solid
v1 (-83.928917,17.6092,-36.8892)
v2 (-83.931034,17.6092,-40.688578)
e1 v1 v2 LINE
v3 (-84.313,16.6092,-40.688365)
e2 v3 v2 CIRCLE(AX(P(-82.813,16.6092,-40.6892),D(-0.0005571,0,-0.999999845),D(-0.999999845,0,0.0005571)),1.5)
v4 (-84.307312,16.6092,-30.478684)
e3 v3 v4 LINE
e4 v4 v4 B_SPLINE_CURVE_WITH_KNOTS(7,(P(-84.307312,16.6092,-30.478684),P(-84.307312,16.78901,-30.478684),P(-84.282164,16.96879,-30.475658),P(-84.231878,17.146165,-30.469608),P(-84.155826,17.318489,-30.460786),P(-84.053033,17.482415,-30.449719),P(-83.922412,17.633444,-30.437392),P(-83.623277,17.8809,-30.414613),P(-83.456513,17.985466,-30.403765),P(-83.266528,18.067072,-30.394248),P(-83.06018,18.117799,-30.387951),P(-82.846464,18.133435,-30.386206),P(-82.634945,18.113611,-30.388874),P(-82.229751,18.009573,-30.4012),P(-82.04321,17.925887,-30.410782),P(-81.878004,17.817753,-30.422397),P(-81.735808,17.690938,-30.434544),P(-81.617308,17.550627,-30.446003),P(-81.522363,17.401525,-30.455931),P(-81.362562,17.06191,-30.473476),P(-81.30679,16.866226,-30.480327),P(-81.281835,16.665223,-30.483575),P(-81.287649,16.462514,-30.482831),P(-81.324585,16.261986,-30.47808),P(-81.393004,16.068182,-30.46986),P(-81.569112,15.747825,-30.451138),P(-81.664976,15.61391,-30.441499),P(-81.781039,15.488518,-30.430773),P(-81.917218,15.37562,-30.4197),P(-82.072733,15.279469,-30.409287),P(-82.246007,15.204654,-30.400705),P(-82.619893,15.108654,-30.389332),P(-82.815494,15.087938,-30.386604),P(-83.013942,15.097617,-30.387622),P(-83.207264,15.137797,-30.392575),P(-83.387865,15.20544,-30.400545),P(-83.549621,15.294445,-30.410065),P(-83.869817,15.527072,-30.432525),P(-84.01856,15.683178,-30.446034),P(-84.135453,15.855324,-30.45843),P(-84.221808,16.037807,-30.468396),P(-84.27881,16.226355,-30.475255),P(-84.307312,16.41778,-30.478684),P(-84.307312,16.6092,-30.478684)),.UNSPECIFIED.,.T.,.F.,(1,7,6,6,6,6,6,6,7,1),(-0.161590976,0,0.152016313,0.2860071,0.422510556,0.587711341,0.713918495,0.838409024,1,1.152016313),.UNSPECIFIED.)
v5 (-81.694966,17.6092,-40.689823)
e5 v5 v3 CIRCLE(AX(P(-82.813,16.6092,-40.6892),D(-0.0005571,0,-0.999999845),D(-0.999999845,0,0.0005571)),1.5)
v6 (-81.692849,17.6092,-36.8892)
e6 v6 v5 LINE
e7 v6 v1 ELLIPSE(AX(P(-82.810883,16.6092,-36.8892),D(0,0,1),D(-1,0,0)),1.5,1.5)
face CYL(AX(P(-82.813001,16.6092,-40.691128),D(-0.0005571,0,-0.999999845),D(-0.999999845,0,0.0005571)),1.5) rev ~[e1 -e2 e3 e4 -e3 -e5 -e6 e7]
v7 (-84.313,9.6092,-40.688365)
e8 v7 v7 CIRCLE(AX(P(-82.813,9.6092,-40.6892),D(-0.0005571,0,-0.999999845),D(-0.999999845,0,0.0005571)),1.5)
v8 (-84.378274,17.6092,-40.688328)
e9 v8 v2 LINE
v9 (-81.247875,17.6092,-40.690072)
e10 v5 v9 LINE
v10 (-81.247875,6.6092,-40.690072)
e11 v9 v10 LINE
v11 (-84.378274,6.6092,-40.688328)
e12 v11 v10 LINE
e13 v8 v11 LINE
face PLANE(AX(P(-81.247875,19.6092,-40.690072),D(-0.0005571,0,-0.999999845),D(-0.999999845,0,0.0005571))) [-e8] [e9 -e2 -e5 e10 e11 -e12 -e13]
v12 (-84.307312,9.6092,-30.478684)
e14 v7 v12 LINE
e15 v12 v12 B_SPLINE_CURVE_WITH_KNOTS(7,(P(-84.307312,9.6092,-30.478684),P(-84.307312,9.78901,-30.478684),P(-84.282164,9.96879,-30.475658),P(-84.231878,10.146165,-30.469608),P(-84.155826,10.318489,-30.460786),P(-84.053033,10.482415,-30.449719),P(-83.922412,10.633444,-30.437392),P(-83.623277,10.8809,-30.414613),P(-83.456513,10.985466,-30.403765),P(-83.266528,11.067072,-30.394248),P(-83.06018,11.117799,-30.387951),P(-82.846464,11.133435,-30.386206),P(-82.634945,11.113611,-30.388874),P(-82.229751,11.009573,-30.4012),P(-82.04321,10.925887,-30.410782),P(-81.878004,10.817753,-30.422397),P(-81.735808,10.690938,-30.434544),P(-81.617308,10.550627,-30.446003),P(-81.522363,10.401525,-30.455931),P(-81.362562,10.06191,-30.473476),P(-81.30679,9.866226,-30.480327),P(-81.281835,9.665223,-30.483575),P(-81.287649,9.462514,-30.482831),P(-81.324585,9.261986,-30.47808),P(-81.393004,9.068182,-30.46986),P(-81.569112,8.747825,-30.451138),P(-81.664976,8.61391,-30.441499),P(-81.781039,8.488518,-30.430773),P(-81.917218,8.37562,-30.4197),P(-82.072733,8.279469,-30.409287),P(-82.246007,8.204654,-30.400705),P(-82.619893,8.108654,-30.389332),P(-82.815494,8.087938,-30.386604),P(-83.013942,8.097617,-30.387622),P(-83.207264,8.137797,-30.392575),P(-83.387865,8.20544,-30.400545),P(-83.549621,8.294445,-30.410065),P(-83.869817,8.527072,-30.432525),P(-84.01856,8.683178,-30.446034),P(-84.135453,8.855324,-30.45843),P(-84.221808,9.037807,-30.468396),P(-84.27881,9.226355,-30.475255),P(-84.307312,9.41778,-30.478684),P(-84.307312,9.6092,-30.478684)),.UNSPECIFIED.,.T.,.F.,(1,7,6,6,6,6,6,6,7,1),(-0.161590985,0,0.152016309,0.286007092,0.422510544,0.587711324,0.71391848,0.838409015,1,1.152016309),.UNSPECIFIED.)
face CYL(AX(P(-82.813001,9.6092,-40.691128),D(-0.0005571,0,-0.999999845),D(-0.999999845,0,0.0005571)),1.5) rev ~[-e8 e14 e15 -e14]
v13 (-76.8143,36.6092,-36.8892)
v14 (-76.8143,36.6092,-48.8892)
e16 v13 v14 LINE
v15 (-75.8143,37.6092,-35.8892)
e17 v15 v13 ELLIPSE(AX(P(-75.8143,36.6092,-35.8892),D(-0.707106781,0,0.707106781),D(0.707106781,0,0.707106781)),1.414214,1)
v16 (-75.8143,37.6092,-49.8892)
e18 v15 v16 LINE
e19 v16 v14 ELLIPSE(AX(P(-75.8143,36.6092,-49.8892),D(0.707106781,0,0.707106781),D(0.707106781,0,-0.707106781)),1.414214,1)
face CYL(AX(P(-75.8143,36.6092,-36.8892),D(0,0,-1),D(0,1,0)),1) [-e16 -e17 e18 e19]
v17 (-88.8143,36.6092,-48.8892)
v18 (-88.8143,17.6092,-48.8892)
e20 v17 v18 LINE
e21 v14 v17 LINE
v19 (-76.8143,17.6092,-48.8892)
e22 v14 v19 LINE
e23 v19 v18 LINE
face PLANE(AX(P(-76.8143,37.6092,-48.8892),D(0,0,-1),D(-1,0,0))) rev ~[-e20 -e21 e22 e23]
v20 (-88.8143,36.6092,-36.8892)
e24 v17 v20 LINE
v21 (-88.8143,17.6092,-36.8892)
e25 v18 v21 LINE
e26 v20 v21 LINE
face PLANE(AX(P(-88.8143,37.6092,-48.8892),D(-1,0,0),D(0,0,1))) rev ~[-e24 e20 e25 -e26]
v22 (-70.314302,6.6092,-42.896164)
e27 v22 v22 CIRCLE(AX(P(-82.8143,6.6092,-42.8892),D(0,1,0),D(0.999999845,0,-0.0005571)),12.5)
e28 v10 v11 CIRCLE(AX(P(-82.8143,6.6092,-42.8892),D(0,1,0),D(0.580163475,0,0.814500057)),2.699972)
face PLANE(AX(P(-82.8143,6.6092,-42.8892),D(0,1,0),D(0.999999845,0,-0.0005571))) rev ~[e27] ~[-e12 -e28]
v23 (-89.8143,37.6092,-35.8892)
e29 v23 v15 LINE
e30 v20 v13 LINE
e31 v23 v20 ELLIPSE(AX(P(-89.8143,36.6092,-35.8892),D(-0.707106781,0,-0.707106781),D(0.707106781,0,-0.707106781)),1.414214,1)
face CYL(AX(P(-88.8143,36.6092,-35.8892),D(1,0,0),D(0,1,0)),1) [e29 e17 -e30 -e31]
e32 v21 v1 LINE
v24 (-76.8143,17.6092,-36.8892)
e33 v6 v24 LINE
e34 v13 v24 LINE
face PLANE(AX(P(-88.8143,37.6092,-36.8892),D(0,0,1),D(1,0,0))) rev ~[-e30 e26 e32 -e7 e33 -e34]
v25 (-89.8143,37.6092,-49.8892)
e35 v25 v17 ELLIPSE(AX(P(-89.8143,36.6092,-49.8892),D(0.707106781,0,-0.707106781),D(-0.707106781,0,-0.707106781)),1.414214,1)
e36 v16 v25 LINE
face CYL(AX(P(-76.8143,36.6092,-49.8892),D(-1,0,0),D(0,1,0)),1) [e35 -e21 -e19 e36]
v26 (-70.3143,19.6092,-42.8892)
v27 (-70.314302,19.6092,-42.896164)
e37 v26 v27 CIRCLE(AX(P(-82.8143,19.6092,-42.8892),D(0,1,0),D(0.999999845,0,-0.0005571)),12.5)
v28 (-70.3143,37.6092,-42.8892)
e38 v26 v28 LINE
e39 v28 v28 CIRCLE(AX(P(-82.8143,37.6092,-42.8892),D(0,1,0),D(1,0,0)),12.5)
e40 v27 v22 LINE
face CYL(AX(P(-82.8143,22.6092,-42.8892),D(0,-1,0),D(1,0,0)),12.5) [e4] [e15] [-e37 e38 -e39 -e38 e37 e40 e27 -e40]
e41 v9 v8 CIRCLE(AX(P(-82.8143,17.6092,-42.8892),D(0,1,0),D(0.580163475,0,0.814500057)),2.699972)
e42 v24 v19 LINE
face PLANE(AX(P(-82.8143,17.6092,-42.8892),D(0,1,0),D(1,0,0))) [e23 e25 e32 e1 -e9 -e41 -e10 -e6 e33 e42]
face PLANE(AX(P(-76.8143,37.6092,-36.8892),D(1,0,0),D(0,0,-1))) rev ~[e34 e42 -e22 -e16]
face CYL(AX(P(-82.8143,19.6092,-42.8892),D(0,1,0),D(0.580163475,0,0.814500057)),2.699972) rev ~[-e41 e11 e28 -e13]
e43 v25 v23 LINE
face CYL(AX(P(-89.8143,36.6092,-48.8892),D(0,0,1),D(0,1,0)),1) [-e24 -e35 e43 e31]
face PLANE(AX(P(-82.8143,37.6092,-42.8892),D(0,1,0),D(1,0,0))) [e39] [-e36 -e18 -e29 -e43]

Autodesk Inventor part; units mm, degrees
ref_plane "YZ Plane" through (0, 0, 0) normal (1, 0, 0) x (0, 1, 0)
ref_plane "XZ Plane" through (0, 0, 0) normal (0, 1, 0) x (-1, 0, 0)
ref_plane "XY Plane" through (0, 0, 0) normal (0, 0, 1) x (1, 0, 0)
ref_plane "Work Plane1" through (-82.8143, 19.6092, -42.8892) normal (0, 1, 0) x (0.9999998, 0, -0.0005571)
sketch "Sketch1" plane through (-82.8143, 19.6092, -42.8892) normal (0, 1, 0) x (0.9999998, 0, -0.0005571)
  arc A0 (1.5, -2) -> (-1.5, -2) centre (0, 0) ccw projected
  line L0 (-1.5, -2) -> (-1.1358, -2) projected
  line L1 (-1.1358, -2) -> (1.1358, -2) projected
  line L2 (1.1358, -2) -> (1.5, -2) projected
  line L3 (1.1358, -2.2) -> (-1.1358, -2.2)
  line L4 (-1.1358, -2.2) -> (-1.5652, -2.2)
  arc A1 (1.5652, -2.2) -> (-1.5652, -2.2) centre (0, 0) ccw
  line L5 (1.5652, -2.2) -> (1.1358, -2.2)
  circle A2 centre (0, 0) radius 12.5
  point P0 (82.7904, -42.9353)
  dimension "d0" = 0.2
  dimension "d1" = 25
extrude "Extrusion1" add sketch "Sketch1" against normal blind 13 contours A2
sketch "Sketch2" plane through (-81.2478, 6.6092, -40.69) normal (-0.0005571, 0, -0.9999998) x (-0.9999998, 0, 0.0005571)
  spline S0 degree 2 poles (3.0652, 12.8) (2.8756, 12.9138) (2.701, 13) knots 0 0 0 1 1 1 weights 1.078346 1.041437 1
  line L0 (3.0652, -2) -> (3.0652, 12.8)
  arc A0 (0.0652, -2) -> (3.0652, -2) centre (1.5652, 0.5981) ccw
  line L1 (0.0652, 12.8) -> (0.0652, -2)
  spline S1 degree 2 poles (0.4295, 13) (0.2549, 12.9138) (0.0652, 12.8) knots 0 0 0 1 1 1 weights 1 1.041437 1.078346
  line L2 (2.701, 13) -> (0.4295, 13)
  circle A1 centre (1.5652, 10) radius 1.5
  circle A2 centre (1.5652, 3) radius 1.5
  line L3 (-10.9348, 0) -> (14.0652, 0)
  point P0 (-81.2252, -6.6092)
  dimension "d4" = 3
  dimension "d5" = 3
  dimension "d6" = 3
  dimension "d7" = 3
extrude "Extrusion2" cut sketch "Sketch2" against normal blind 13 contours A1 | A2
sketch "Sketch3" plane through (-82.8143, 19.6092, -42.8892) normal (0, 1, 0) x (1, 0, 0)
  circle A0 centre (0, 0) radius 12.5 projected
  line L0 (1.5665, -2.1991) -> (-1.564, -2.2009) projected
  arc A1 (1.5665, -2.1991) -> (-1.564, -2.2009) centre (0, 0) ccw projected
  point P0 (82.8143, -42.8892)
extrude "Extrusion3" add sketch "Sketch3" along normal blind 3 contours A0 | L0 A1
move faces "Move1" translate (0, 15, 0) faces at (-80.4474, 22.6092, -41.4544)
sketch "Sketch5" plane through (-82.8143, 37.6092, -42.8892) normal (0, 1, 0) x (1, 0, 0)
  line L0 (6, 6) -> (-6, 6)
  line L1 (-6, 6) -> (-6, -6)
  line L2 (-6, -6) -> (6, -6)
  line L3 (6, -6) -> (6, 6)
  line L4 (6, 6) -> (-6, -6) construction
  line L5 (-6, 6) -> (6, -6) construction
  point P0 (82.8143, -42.8892)
  point P1 (0, 0)
  dimension "d18" = 12
  dimension "d19" = 12
extrude "Extrusion5" cut sketch "Sketch5" against normal blind 20
fillet "Fillet2" radius 1 4 edges at (-82.8143, 37.6092, -36.8892) (-76.8143, 37.6092, -42.8892) (-82.8143, 37.6092, -48.8892) (-88.8143, 37.6092, -42.8892)
sketch "Sketch6" plane through (-82.8143, 17.6092, -42.8892) normal (0, 1, 0) x (1, 0, 0)
  line L0 (-1.1168, -2.2006) -> (-1.1147, -6) projected
  line L1 (-1.564, -2.2009) -> (-1.1168, -2.2006) projected
  arc A0 (1.5665, -2.1991) -> (-1.564, -2.2009) centre (0, 0) ccw projected
  line L2 (1.1193, -2.1994) -> (1.5665, -2.1991) projected
  line L3 (1.1214, -6) -> (1.1193, -2.1994) projected
  line L4 (6, -6) -> (1.1214, -6) projected
  line L5 (6, 6) -> (6, -6) projected
  line L6 (-6, 6) -> (6, 6) projected
  line L7 (-6, -6) -> (-6, 6) projected
  line L8 (-1.1147, -6) -> (-6, -6) projected
  line L9 (6, -6) -> (-6, -6) projected
ref_plane "Work Plane2" through (4.3942, -24.185, 88.7409) normal (0, 1, 0) x (0.9994696, 0, 0.0325661)
sketch "Sketch7" plane through (4.3942, -24.185, 88.7409) normal (0, 1, 0) x (0.9994696, 0, 0.0325661)
  point P0 (-7.2818, 88.5508)
equation "\"d7\" = d6"
properties part number "Motor-Driver Coupler"
